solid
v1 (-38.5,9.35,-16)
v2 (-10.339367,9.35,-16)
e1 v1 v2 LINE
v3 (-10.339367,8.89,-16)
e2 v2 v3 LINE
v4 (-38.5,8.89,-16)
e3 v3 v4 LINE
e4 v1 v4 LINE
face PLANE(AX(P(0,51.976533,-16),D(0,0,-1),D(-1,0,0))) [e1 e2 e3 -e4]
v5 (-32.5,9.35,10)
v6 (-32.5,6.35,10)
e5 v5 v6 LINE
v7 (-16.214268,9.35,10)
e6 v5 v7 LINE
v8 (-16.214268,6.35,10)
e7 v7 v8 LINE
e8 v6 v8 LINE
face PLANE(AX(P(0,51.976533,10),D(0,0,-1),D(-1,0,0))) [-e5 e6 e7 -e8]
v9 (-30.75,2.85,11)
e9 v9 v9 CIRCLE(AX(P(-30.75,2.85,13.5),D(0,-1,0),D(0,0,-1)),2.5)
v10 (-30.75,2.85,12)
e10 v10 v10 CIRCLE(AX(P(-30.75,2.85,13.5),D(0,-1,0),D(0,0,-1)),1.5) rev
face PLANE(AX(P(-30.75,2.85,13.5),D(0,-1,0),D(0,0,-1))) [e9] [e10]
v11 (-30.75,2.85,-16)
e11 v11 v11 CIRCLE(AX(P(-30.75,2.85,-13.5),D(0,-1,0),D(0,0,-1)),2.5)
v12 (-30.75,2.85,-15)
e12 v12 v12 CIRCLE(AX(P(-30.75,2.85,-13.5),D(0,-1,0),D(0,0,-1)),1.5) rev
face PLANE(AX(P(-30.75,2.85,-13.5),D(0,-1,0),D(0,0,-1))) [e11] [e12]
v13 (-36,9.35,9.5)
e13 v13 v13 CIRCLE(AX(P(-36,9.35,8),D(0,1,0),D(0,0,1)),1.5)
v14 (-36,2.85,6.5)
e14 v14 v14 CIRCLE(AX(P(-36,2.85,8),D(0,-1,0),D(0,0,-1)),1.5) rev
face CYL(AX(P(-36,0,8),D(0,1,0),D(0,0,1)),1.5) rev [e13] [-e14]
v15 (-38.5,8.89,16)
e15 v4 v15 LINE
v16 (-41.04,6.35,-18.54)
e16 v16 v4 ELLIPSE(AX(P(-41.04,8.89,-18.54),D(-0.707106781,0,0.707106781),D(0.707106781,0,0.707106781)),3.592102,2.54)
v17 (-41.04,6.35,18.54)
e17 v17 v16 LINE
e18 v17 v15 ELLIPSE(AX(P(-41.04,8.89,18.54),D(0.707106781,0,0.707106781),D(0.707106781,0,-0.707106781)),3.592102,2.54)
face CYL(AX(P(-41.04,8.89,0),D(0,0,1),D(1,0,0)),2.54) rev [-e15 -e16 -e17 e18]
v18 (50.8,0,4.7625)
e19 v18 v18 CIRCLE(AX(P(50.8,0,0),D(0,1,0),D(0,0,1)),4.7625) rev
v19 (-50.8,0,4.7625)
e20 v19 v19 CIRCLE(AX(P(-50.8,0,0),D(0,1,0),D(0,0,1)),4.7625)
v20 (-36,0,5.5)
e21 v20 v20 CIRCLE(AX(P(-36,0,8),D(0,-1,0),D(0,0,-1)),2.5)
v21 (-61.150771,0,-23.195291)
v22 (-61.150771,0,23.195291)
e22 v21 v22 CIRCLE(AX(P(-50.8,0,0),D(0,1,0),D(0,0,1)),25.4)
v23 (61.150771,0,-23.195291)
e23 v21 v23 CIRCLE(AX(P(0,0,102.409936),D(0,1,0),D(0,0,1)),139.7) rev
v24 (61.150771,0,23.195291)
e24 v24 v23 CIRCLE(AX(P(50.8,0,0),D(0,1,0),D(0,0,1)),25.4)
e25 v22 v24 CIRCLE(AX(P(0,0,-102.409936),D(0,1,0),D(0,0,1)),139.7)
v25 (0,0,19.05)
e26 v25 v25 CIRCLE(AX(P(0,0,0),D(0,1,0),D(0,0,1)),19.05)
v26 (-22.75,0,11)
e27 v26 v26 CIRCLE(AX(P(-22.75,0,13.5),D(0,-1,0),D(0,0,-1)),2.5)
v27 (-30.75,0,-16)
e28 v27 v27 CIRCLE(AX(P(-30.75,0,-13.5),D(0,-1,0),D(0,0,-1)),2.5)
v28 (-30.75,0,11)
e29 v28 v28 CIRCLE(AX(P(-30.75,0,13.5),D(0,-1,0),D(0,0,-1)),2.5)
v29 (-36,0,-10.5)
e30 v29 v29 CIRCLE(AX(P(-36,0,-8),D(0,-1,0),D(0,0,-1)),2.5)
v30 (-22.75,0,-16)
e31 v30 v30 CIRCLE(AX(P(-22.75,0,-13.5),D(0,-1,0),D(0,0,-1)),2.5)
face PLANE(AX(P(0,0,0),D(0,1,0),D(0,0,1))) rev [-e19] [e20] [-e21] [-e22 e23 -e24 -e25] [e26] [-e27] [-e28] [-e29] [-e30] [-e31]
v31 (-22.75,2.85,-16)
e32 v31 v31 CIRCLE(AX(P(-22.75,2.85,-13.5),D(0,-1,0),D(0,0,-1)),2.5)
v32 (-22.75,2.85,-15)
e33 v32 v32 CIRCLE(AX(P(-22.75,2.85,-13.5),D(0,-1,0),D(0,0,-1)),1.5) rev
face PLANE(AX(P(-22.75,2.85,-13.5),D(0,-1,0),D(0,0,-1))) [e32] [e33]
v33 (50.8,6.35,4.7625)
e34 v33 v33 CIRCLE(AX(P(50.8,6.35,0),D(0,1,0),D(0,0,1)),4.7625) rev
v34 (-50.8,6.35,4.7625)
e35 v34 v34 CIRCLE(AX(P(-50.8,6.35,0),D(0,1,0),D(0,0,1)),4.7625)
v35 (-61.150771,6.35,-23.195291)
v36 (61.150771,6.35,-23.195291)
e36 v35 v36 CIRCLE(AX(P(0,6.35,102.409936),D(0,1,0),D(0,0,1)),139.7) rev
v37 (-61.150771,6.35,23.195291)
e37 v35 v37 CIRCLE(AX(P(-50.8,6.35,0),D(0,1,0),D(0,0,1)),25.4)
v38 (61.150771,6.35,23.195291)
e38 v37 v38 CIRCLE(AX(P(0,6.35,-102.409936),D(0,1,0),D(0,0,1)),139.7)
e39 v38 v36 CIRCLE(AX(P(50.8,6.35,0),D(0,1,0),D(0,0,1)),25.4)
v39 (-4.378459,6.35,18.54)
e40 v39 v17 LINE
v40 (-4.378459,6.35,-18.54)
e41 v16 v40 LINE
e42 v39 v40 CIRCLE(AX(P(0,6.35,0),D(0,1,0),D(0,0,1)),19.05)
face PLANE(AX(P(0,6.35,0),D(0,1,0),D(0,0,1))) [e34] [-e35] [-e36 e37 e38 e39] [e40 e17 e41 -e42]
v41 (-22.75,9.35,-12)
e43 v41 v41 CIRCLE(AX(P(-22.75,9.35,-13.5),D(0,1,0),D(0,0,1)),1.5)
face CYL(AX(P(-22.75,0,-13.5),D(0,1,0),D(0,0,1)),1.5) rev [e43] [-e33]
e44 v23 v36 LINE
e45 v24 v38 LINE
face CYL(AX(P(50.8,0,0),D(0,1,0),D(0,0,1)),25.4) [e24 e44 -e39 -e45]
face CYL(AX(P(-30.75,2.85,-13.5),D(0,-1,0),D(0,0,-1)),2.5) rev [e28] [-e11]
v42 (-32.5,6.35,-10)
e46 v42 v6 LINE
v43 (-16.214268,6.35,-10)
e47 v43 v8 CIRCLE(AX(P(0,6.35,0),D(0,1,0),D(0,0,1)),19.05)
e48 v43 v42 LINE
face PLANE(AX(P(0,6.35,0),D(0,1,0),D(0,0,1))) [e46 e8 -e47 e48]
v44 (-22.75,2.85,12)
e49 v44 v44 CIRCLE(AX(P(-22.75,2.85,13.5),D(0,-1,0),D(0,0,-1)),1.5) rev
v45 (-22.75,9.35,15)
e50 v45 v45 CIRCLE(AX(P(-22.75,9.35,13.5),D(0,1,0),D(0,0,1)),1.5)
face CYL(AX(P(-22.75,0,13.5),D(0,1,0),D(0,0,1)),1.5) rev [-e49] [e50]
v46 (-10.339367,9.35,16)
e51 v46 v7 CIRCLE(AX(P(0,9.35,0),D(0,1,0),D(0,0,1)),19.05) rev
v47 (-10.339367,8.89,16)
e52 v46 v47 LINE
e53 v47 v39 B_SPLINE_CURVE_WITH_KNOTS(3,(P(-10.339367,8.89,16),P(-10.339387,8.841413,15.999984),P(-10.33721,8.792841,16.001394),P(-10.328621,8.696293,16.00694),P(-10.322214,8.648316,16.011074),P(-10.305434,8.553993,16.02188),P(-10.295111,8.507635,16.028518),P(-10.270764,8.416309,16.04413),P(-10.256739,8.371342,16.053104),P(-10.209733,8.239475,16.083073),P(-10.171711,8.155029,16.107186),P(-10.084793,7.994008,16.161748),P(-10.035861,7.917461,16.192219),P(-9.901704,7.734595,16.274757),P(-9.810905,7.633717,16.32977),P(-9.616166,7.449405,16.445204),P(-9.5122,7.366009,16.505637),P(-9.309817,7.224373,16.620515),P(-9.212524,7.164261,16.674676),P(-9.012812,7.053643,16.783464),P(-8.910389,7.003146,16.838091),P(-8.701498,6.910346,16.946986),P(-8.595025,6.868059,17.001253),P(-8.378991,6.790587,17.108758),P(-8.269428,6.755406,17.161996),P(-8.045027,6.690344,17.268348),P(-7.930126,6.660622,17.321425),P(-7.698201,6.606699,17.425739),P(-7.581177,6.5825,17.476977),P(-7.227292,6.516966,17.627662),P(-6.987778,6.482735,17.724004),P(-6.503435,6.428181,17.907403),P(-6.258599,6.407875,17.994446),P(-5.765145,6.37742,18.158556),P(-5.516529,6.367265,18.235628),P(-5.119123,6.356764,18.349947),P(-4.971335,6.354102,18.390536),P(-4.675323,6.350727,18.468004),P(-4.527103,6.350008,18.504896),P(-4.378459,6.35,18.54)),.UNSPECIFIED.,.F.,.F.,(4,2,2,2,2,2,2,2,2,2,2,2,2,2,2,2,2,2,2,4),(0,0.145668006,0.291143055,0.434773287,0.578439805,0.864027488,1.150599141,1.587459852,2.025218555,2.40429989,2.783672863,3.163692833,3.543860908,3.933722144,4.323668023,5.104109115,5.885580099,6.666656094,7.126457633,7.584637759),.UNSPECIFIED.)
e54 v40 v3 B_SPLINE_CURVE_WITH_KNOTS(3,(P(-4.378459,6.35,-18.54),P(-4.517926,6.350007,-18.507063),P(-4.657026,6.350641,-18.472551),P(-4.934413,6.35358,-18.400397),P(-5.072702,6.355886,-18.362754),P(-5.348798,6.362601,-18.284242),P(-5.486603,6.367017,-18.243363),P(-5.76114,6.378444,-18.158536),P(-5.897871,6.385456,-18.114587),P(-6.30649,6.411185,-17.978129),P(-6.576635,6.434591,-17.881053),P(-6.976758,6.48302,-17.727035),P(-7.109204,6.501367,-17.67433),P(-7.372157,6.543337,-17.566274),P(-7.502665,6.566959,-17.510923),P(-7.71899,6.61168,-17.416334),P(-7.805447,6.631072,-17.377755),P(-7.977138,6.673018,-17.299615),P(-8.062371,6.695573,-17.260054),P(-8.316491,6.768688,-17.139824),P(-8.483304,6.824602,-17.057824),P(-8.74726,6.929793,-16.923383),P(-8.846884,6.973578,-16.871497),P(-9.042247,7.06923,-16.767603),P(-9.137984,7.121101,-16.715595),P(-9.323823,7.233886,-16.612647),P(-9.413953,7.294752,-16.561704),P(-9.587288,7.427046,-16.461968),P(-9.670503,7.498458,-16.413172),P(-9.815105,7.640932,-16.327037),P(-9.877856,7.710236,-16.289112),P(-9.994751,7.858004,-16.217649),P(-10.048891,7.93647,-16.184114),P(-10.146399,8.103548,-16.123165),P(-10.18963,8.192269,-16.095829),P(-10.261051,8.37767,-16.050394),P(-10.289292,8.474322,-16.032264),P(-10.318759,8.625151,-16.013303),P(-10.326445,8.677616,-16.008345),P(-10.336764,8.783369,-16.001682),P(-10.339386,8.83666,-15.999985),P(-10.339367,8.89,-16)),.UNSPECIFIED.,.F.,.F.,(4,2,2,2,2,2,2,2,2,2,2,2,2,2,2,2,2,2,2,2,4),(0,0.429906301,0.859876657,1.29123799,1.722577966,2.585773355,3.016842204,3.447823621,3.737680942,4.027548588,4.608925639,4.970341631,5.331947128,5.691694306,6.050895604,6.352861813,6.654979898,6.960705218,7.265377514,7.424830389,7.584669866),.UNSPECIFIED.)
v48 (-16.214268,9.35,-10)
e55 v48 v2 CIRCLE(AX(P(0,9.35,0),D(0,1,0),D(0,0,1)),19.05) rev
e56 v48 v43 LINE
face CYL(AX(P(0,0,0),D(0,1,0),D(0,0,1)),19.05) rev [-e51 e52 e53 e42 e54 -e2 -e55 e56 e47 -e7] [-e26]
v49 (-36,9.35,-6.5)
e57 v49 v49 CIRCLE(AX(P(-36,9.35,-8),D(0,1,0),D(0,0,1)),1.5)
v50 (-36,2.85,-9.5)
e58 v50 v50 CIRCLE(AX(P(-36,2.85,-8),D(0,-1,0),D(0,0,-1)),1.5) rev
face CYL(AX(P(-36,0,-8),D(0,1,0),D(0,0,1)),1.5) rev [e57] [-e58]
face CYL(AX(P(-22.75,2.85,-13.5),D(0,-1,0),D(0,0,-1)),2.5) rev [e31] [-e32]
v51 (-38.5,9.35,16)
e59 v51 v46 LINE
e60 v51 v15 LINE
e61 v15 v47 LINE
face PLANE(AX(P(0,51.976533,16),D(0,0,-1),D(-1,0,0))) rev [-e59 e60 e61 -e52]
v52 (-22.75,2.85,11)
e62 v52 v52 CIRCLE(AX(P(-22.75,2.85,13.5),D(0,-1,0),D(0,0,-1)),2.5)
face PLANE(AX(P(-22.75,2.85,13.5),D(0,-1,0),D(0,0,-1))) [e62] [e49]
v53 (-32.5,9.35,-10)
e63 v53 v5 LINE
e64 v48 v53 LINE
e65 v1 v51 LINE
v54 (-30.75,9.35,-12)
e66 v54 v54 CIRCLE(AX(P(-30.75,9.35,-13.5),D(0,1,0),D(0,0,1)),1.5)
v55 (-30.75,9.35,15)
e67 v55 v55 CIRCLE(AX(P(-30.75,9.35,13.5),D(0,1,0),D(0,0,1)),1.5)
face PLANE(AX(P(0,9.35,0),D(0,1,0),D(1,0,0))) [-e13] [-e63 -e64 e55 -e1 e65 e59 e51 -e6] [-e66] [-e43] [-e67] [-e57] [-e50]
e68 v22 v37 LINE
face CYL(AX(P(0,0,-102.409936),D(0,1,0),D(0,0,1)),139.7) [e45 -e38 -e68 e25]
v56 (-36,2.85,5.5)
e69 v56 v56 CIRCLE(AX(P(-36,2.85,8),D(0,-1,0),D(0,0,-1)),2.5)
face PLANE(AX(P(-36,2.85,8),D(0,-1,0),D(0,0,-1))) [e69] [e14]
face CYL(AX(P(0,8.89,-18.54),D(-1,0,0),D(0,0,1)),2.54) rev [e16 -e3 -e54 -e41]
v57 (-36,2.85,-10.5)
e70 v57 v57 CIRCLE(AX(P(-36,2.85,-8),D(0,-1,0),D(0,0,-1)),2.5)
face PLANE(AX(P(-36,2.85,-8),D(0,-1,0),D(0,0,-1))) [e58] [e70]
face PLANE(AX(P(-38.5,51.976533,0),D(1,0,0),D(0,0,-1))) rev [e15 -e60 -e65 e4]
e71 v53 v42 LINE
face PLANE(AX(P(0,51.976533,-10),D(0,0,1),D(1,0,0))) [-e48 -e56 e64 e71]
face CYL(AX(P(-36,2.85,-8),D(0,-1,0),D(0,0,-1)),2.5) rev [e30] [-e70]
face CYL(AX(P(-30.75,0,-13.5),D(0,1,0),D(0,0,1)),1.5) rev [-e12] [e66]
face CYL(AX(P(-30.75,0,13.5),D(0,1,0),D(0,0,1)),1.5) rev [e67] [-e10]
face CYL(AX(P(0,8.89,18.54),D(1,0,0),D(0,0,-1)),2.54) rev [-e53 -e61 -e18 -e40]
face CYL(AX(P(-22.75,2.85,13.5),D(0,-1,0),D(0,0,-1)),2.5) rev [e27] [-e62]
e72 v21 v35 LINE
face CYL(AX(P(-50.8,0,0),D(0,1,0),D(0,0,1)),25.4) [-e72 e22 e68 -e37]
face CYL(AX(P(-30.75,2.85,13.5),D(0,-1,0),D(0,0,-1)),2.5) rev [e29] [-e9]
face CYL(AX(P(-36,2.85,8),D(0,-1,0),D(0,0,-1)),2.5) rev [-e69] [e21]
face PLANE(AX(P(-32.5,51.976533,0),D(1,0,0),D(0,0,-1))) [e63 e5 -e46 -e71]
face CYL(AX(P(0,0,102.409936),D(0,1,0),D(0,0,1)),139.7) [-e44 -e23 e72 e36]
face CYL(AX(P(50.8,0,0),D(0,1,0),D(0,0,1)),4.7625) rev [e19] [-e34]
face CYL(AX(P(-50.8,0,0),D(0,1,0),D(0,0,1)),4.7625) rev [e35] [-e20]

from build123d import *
from build123d.topology import SkipClean

# Parameters (mm, degrees)
SKETCH1_R           = 76.2
BOSS_EXTRUDE1_DEPTH = 6.35
CUT_EXTRUDE2_START  = -6.35
SKETCH2_R           = 4.7625
SKETCH2_R_2         = 19.05
CUT_EXTRUDE2_DEPTH  = 6.35
BOSS_EXTRUDE2_DEPTH = 3
SKETCH4_R           = 1.5
SKETCH4_R_2         = 1.25
CUT_EXTRUDE3_DEPTH  = 86.348763
FILLET1_R           = 2.54
SKETCH5_R           = 2.5
CUT_EXTRUDE4_DEPTH  = 2.85


with BuildPart() as part:
    # Sketch1 → Boss-Extrude1 (new body)
    with BuildSketch(Plane(origin=(0, 0, 0), x_dir=(1, 0, 0), z_dir=(0, 1, 0))):
        with Locations(Location((0, 0, 0), (0, 0, 270))):
            Circle(SKETCH1_R)
    extrude(amount=BOSS_EXTRUDE1_DEPTH)

    # Sketch2 → Cut-Extrude2 (cut)
    with BuildSketch(Plane(origin=(0, 6.35, 0), x_dir=(1, 0, 0), z_dir=(0, 1, 0)).offset(CUT_EXTRUDE2_START)):
        with BuildLine():
            ThreePointArc((61.150771, -23.195291), (0, -37.290064), (-61.150771, -23.195291))
            ThreePointArc((-61.150771, -23.195291), (-72.108092, -13.824804), (-76.2, 0))
            ThreePointArc((-76.2, 0), (0, -76.2), (76.2, 0))
            ThreePointArc((76.2, 0), (72.108092, -13.824804), (61.150771, -23.195291))
        make_face()
        with BuildLine():
            ThreePointArc((-61.150771, 23.195291), (0, 37.290064), (61.150771, 23.195291))
            ThreePointArc((61.150771, 23.195291), (72.108092, 13.824804), (76.2, 0))
            ThreePointArc((76.2, 0), (0, 76.2), (-76.2, 0))
            ThreePointArc((-76.2, 0), (-72.108092, 13.824804), (-61.150771, 23.195291))
        make_face()
        with Locations(Location((-50.8, 0, 0), (0, 0, 270))):
            Circle(SKETCH2_R)
        with Locations(Location((50.8, 0, 0), (0, 0, 270))):
            Circle(SKETCH2_R)
        with Locations(Location((0, 0, 0), (0, 0, 270))):
            Circle(SKETCH2_R_2)
    extrude(amount=CUT_EXTRUDE2_DEPTH, mode=Mode.SUBTRACT)

    # Sketch3 → Boss-Extrude2 (add)
    with SkipClean():  # the faces are left unmerged after this step: merging them gives an invalid solid
        with BuildSketch(Plane(origin=(0, 6.35, 0), x_dir=(1, 0, 0), z_dir=(0, 1, 0))):
            with BuildLine():
                Line((-38.5, 4.75), (-38.5, -4.75))
                Line((-38.5, -4.75), (-38.5, -11.25))
                Line((-38.5, -11.25), (-38.5, -16))
                Line((-38.5, -16), (-18, -16))
                Line((-18, -16), (-11.5, -16))
                Line((-11.5, -16), (-10.339367, -16))
                ThreePointArc((-10.339367, -16), (-13.611535, -13.327739), (-16.214268, -10))
                Line((-16.214268, -10), (-31.096327, -10))
                Line((-31.096327, -10), (-32.5, -10))
                Line((-32.5, -10), (-32.5, -8.522949))
                Line((-32.5, -8.522949), (-32.5, 8.425596))
                Line((-32.5, 8.425596), (-32.5, 10))
                Line((-32.5, 10), (-31.027855, 10))
                Line((-31.027855, 10), (-16.214268, 10))
                ThreePointArc((-16.214268, 10), (-13.611535, 13.327739), (-10.339367, 16))
                Line((-10.339367, 16), (-11.5, 16))
                Line((-11.5, 16), (-18, 16))
                Line((-18, 16), (-38.5, 16))
                Line((-38.5, 16), (-38.5, 11.25))
                Line((-38.5, 11.25), (-38.5, 4.75))
            make_face()
        extrude(amount=BOSS_EXTRUDE2_DEPTH)

    # Sketch4 → Cut-Extrude3 (cut, through all)
    # profile 1 of 12: a face of its own
    with SkipClean():  # the faces are left unmerged after this step: merging them gives an invalid solid
        with BuildSketch(Plane(origin=(0, 9.35, 0), x_dir=(1, 0, 0), z_dir=(0, 1, 0))):
            with Locations(Location((-30.75, -13.5, 0), (0, 0, 270))):
                Circle(SKETCH4_R)
            with Locations((-30.75, -13.5)):
                Circle(SKETCH4_R_2, mode=Mode.SUBTRACT)
        # profile 2 of 12: a face of its own
        with BuildSketch(Plane(origin=(0, 9.35, 0), x_dir=(1, 0, 0), z_dir=(0, 1, 0))):
            with Locations((-30.75, -13.5)):
                Circle(SKETCH4_R_2)
        # profile 3 of 12: a face of its own
        with BuildSketch(Plane(origin=(0, 9.35, 0), x_dir=(1, 0, 0), z_dir=(0, 1, 0))):
            with Locations(Location((-22.75, -13.5, 0), (0, 0, 270))):
                Circle(SKETCH4_R)
            with Locations((-22.75, -13.5)):
                Circle(SKETCH4_R_2, mode=Mode.SUBTRACT)
        # profile 4 of 12: a face of its own
        with BuildSketch(Plane(origin=(0, 9.35, 0), x_dir=(1, 0, 0), z_dir=(0, 1, 0))):
            with Locations((-22.75, -13.5)):
                Circle(SKETCH4_R_2)
        # profile 5 of 12: a face of its own
        with BuildSketch(Plane(origin=(0, 9.35, 0), x_dir=(1, 0, 0), z_dir=(0, 1, 0))):
            with Locations(Location((-36, -8, 0), (0, 0, 270))):
                Circle(SKETCH4_R)
            with Locations((-36, -8)):
                Circle(SKETCH4_R_2, mode=Mode.SUBTRACT)
        # profile 6 of 12: a face of its own
        with BuildSketch(Plane(origin=(0, 9.35, 0), x_dir=(1, 0, 0), z_dir=(0, 1, 0))):
            with Locations((-36, -8)):
                Circle(SKETCH4_R_2)
        # profile 7 of 12: a face of its own
        with BuildSketch(Plane(origin=(0, 9.35, 0), x_dir=(1, 0, 0), z_dir=(0, 1, 0))):
            with Locations(Location((-36, 8, 0), (0, 0, 270))):
                Circle(SKETCH4_R)
            with Locations((-36, 8)):
                Circle(SKETCH4_R_2, mode=Mode.SUBTRACT)
        # profile 8 of 12: a face of its own
        with BuildSketch(Plane(origin=(0, 9.35, 0), x_dir=(1, 0, 0), z_dir=(0, 1, 0))):
            with Locations((-36, 8)):
                Circle(SKETCH4_R_2)
        # profile 9 of 12: a face of its own
        with BuildSketch(Plane(origin=(0, 9.35, 0), x_dir=(1, 0, 0), z_dir=(0, 1, 0))):
            with Locations(Location((-30.75, 13.5, 0), (0, 0, 270))):
                Circle(SKETCH4_R)
            with Locations((-30.75, 13.5)):
                Circle(SKETCH4_R_2, mode=Mode.SUBTRACT)
        # profile 10 of 12: a face of its own
        with BuildSketch(Plane(origin=(0, 9.35, 0), x_dir=(1, 0, 0), z_dir=(0, 1, 0))):
            with Locations((-30.75, 13.5)):
                Circle(SKETCH4_R_2)
        # profile 11 of 12: a face of its own
        with BuildSketch(Plane(origin=(0, 9.35, 0), x_dir=(1, 0, 0), z_dir=(0, 1, 0))):
            with Locations(Location((-22.75, 13.5, 0), (0, 0, 270))):
                Circle(SKETCH4_R)
            with Locations((-22.75, 13.5)):
                Circle(SKETCH4_R_2, mode=Mode.SUBTRACT)
        # profile 12 of 12: a face of its own
        with BuildSketch(Plane(origin=(0, 9.35, 0), x_dir=(1, 0, 0), z_dir=(0, 1, 0))):
            with Locations((-22.75, 13.5)):
                Circle(SKETCH4_R_2)
        extrude(amount=-CUT_EXTRUDE3_DEPTH, mode=Mode.SUBTRACT)

    # Fillet1
    # the kernel refuses this fillet: 2.54 mm, written as the material it adds along each edge
    with BuildSketch(Plane(origin=(-3.989367, 6.35, -16), x_dir=(0, 0, -1), z_dir=(-1, 0, 0))) as fillet1_piece_1_section:
        with BuildLine():
            CenterArc((FILLET1_R, -FILLET1_R), FILLET1_R, 90, 90)
            Line((0, -FILLET1_R), (0, 0))
            Line((0, 0), (FILLET1_R, 0))
        make_face()
    fillet1_piece_1 = extrude(amount=34.510633, mode=Mode.PRIVATE)
    fillet1_piece_1 = fillet1_piece_1 - Plane(origin=(0, 6.913548, 0), x_dir=(0, 0, 1), z_dir=(0, -1, 0)) * Cylinder(19.05, 80, mode=Mode.PRIVATE)
    add(fillet1_piece_1)
    with BuildSketch(Plane(origin=(-38.5, 6.35, 16), x_dir=(0, 0, 1), z_dir=(1, 0, 0))) as fillet1_piece_2_section:
        with BuildLine():
            CenterArc((FILLET1_R, -FILLET1_R), FILLET1_R, 90, 90)
            Line((0, -FILLET1_R), (0, 0))
            Line((0, 0), (FILLET1_R, 0))
        make_face()
    fillet1_piece_2 = extrude(amount=34.510633, mode=Mode.PRIVATE)
    fillet1_piece_2 = fillet1_piece_2 - Plane(origin=(0, 6.913549, 0), x_dir=(0, 0, 1), z_dir=(0, -1, 0)) * Cylinder(19.05, 80, mode=Mode.PRIVATE)
    add(fillet1_piece_2)
    with BuildSketch(Plane(origin=(-38.5, 6.35, -16), x_dir=(-1, 0, 0), z_dir=(0, 0, 1))) as fillet1_piece_3:
        with BuildLine():
            CenterArc((FILLET1_R, -FILLET1_R), FILLET1_R, 90, 90)
            Line((0, -FILLET1_R), (0, 0))
            Line((0, 0), (FILLET1_R, 0))
        make_face()
    extrude(amount=32)
    with BuildSketch(Plane(origin=(-3.989367, 6.35, -16), x_dir=(0, 0, -1), z_dir=(-1, 0, 0))) as fillet1_piece_4a_section:
        with BuildLine():
            CenterArc((FILLET1_R, -FILLET1_R), FILLET1_R, 90, 90)
            Line((0, -FILLET1_R), (0, 0))
            Line((0, 0), (FILLET1_R, 0))
        make_face()
    fillet1_piece_4a = extrude(amount=40.860633, mode=Mode.PRIVATE)
    fillet1_piece_4a = split(fillet1_piece_4a, bisect_by=Plane(origin=(-38.5, 6.925044, -16.575044), z_dir=(-1, 0, 0)), keep=Keep.TOP, mode=Mode.PRIVATE)
    with BuildSketch(Plane(origin=(-38.5, 6.35, -22.35), x_dir=(-1, 0, 0), z_dir=(0, 0, 1))) as fillet1_piece_4b_section:
        with BuildLine():
            CenterArc((FILLET1_R, -FILLET1_R), FILLET1_R, 90, 90)
            Line((0, -FILLET1_R), (0, 0))
            Line((0, 0), (FILLET1_R, 0))
        make_face()
    fillet1_piece_4b = extrude(amount=38.35, mode=Mode.PRIVATE)
    fillet1_piece_4b = split(fillet1_piece_4b, bisect_by=Plane(origin=(-39.075044, 6.925044, -16), z_dir=(0, 0, -1)), keep=Keep.TOP, mode=Mode.PRIVATE)
    fillet1_piece_4 = fillet1_piece_4a & fillet1_piece_4b
    add(fillet1_piece_4)
    with BuildSketch(Plane(origin=(-38.5, 6.35, -16), x_dir=(-1, 0, 0), z_dir=(0, 0, 1))) as fillet1_piece_5a_section:
        with BuildLine():
            CenterArc((FILLET1_R, -FILLET1_R), FILLET1_R, 90, 90)
            Line((0, -FILLET1_R), (0, 0))
            Line((0, 0), (FILLET1_R, 0))
        make_face()
    fillet1_piece_5a = extrude(amount=38.35, mode=Mode.PRIVATE)
    fillet1_piece_5a = split(fillet1_piece_5a, bisect_by=Plane(origin=(-39.075044, 6.925044, 16), z_dir=(0, 0, 1)), keep=Keep.TOP, mode=Mode.PRIVATE)
    with BuildSketch(Plane(origin=(-44.85, 6.35, 16), x_dir=(0, 0, 1), z_dir=(1, 0, 0))) as fillet1_piece_5b_section:
        with BuildLine():
            CenterArc((FILLET1_R, -FILLET1_R), FILLET1_R, 90, 90)
            Line((0, -FILLET1_R), (0, 0))
            Line((0, 0), (FILLET1_R, 0))
        make_face()
    fillet1_piece_5b = extrude(amount=40.860633, mode=Mode.PRIVATE)
    fillet1_piece_5b = split(fillet1_piece_5b, bisect_by=Plane(origin=(-38.5, 6.925044, 16.575044), z_dir=(-1, 0, 0)), keep=Keep.TOP, mode=Mode.PRIVATE)
    fillet1_piece_5 = fillet1_piece_5a & fillet1_piece_5b
    add(fillet1_piece_5)

    # Sketch5 → Cut-Extrude4 (cut)
    with BuildSketch(Plane.XZ):
        with Locations(Location((-22.75, 13.5, 0), (0, 0, 270))):
            Circle(SKETCH5_R)
        with Locations(Location((-30.75, 13.5, 0), (0, 0, 270))):
            Circle(SKETCH5_R)
        with Locations(Location((-36, 8, 0), (0, 0, 270))):
            Circle(SKETCH5_R)
        with Locations(Location((-36, -8, 0), (0, 0, 270))):
            Circle(SKETCH5_R)
        with Locations(Location((-30.75, -13.5, 0), (0, 0, 270))):
            Circle(SKETCH5_R)
        with Locations(Location((-22.75, -13.5, 0), (0, 0, 270))):
            Circle(SKETCH5_R)
    extrude(amount=-CUT_EXTRUDE4_DEPTH, mode=Mode.SUBTRACT)


solid = part.part
